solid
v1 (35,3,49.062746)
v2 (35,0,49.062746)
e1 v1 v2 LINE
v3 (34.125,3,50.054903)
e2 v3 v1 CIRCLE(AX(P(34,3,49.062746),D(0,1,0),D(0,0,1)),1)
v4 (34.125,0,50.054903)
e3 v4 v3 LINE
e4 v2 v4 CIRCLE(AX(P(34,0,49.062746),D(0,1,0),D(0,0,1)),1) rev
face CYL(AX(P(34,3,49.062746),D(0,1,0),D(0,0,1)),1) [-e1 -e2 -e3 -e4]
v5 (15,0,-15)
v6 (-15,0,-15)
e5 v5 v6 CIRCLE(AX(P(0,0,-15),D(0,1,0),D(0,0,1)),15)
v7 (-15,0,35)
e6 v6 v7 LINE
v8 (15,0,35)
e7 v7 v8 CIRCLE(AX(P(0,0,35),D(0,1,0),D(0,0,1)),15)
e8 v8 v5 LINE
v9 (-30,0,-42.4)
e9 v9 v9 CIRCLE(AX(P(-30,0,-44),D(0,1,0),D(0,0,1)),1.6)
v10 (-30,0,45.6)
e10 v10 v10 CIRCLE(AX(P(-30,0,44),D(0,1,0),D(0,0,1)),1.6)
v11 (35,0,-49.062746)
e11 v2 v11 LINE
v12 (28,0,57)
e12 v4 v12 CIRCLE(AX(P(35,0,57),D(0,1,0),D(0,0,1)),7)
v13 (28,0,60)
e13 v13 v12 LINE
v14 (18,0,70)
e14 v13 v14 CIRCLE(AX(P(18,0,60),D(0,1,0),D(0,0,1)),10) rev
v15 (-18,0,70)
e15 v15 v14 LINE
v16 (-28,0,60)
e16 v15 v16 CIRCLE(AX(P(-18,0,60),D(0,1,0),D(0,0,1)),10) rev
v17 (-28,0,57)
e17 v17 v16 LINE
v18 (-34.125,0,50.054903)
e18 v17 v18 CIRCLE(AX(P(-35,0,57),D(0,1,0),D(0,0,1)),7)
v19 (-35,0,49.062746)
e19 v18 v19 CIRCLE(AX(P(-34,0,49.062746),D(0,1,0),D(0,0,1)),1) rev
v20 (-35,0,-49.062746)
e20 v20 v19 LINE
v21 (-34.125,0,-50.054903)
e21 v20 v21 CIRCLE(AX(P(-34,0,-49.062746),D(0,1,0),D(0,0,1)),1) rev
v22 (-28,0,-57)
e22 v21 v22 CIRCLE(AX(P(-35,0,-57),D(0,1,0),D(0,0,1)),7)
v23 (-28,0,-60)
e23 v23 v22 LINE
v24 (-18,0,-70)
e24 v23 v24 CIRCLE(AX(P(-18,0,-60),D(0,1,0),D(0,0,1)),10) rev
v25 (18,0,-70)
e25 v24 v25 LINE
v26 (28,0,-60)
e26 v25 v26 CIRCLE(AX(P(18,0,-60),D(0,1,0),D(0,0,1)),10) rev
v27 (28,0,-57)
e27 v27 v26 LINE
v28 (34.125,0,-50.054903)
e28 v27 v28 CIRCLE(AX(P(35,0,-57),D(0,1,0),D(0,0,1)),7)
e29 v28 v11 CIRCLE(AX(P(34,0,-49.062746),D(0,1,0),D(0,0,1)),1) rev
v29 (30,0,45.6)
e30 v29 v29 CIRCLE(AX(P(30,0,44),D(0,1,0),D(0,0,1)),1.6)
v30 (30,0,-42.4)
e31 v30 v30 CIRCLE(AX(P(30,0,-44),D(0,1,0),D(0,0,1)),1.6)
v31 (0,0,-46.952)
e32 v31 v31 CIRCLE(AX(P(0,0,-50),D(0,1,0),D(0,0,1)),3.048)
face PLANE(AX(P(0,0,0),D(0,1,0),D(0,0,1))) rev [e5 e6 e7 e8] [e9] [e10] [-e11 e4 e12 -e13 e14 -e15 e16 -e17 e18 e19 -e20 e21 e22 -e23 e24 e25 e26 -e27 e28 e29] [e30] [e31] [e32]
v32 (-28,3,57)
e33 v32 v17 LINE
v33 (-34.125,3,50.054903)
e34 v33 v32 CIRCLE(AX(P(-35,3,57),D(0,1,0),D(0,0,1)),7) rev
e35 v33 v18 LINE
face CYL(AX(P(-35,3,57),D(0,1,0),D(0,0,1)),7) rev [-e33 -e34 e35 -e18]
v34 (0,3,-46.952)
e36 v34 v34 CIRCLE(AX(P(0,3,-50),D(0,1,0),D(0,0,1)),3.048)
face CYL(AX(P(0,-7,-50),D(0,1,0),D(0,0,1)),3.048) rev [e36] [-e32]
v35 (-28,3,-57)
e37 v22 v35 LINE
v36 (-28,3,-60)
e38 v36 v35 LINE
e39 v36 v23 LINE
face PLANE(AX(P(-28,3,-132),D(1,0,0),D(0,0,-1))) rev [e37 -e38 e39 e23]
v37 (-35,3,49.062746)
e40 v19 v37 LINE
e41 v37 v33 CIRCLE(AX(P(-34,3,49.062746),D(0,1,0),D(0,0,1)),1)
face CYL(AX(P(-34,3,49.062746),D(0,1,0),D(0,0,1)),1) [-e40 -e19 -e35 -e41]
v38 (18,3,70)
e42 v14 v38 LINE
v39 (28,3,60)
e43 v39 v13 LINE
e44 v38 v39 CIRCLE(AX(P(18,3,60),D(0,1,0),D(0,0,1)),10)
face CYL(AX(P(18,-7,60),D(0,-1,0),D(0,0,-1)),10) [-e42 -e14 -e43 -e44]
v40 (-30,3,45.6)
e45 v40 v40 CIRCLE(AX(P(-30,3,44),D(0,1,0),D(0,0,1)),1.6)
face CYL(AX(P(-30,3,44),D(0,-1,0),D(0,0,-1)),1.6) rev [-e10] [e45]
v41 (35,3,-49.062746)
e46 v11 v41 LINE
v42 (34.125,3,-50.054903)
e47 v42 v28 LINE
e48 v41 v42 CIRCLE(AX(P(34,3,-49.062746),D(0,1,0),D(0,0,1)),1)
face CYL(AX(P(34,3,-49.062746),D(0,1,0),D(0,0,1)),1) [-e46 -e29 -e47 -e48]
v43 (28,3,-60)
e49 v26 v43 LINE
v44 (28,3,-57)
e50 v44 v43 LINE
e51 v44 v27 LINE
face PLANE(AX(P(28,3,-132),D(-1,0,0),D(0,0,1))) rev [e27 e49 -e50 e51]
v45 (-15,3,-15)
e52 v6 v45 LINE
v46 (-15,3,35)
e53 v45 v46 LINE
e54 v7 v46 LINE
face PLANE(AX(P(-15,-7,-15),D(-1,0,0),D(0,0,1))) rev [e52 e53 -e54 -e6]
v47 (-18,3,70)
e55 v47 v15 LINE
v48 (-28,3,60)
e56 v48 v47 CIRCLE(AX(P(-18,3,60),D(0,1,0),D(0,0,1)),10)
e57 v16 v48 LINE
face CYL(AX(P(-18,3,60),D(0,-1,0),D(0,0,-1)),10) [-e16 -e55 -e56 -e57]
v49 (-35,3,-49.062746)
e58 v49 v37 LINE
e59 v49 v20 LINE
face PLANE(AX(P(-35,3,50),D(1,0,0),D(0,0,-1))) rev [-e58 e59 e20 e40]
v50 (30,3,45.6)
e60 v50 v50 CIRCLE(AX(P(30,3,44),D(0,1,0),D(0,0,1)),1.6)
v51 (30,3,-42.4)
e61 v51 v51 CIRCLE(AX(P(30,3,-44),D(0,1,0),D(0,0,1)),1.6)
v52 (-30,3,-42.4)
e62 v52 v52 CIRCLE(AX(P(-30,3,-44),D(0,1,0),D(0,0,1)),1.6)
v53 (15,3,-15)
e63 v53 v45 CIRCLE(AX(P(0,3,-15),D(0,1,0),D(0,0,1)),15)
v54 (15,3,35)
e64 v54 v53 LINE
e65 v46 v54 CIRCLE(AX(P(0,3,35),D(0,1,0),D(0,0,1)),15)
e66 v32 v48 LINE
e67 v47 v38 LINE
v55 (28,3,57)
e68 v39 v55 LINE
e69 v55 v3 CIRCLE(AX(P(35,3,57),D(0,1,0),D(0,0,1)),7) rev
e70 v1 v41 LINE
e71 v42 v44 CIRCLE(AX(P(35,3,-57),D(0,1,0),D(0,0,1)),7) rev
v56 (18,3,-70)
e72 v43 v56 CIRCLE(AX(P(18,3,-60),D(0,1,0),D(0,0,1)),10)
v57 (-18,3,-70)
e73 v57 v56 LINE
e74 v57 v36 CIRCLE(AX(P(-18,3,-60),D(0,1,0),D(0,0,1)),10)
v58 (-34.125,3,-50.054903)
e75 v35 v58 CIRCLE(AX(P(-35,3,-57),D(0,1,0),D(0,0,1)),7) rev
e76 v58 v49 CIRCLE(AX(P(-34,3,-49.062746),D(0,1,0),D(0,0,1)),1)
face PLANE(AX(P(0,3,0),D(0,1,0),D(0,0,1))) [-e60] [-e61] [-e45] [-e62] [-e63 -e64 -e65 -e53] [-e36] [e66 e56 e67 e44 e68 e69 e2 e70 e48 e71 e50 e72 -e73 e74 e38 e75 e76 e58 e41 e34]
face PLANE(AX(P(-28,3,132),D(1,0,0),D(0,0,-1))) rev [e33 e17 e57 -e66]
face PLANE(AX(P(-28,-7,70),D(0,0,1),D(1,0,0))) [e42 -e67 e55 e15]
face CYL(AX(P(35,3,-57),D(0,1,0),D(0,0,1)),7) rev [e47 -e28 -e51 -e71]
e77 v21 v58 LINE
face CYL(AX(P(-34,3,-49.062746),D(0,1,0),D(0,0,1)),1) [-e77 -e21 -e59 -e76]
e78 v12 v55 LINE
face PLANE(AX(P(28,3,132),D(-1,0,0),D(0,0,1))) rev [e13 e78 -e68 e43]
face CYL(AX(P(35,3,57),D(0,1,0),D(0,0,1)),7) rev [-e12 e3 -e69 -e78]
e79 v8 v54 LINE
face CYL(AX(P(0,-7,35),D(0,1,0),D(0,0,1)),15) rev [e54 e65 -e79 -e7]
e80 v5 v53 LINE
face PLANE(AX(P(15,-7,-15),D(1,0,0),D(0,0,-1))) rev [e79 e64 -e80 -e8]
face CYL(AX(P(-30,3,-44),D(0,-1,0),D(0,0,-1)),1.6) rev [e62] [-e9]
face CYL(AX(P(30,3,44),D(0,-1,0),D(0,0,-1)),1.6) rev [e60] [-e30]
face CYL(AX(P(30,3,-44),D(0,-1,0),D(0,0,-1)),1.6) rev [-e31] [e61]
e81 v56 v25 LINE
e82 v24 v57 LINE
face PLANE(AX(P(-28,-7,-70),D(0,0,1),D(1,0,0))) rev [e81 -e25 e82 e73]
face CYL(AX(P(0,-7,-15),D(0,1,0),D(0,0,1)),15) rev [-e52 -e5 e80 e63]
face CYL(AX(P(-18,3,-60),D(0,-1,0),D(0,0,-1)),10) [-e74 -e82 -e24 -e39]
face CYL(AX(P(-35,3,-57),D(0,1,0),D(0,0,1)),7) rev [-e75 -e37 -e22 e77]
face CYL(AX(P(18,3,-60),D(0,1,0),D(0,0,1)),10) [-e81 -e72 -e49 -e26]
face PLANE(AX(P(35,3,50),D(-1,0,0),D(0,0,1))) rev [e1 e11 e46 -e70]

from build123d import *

# Parameters (mm, degrees)
SKETCH1_R           = 1.6
BOSS_EXTRUDE1_DEPTH = 3
FILLET1_R           = 7
FILLET2_R           = 1
FILLET3_R           = 50
SKETCH2_W           = 59.626658502
SKETCH2_H           = 94.260753609
CUT_EXTRUDE1_DEPTH  = 10
FILLET4_R           = 10
SKETCH3_R           = 3.048
CUT_EXTRUDE2_DEPTH  = 10


with BuildPart() as part:
    # Sketch1 → Boss-Extrude1 (new body)
    with BuildSketch(Plane(origin=(0, 0, 0), x_dir=(1, 0, 0), z_dir=(0, 1, 0))):
        Polygon((-35, -50), (-28, -50), (-28, -132), (0, -144), (28, -132), (28, -50), (35, -50), (35, 50), (28, 50), (28, 132), (0, 144), (-28, 132), (-28, 50), (-35, 50), align=None)
        with Locations(Location((-30, 44, 0), (0, 0, 270))):
            Circle(SKETCH1_R, mode=Mode.SUBTRACT)
        with Locations(Location((30, 44, 0), (0, 0, 270))):
            Circle(SKETCH1_R, mode=Mode.SUBTRACT)
        with Locations(Location((30, -44, 0), (0, 0, 270))):
            Circle(SKETCH1_R, mode=Mode.SUBTRACT)
        with Locations(Location((-30, -44, 0), (0, 0, 270))):
            Circle(SKETCH1_R, mode=Mode.SUBTRACT)
    extrude(amount=BOSS_EXTRUDE1_DEPTH)

    # Fillet1
    fillet1_edges = [part.edges().sort_by_distance(p)[0] for p in [
        (-28, 1.5, 50),
        (28, 1.5, 50),
        (28, 1.5, -50),
        (-28, 1.5, -50),
    ]]
    fillet(fillet1_edges, radius=FILLET1_R - 0.0001)  # a hair under: the kernel refuses the full size

    # Fillet2
    fillet2_edges = [part.edges().sort_by_distance(p)[0] for p in [
        (35, 1.5, -50),
        (35, 1.5, 50),
        (-35, 1.5, 50),
        (-35, 1.5, -50),
    ]]
    fillet(fillet2_edges, radius=FILLET2_R)

    # Fillet3
    fillet3_edges = [part.edges().sort_by_distance(p)[0] for p in [
        (0, 1.5, 144),
        (0, 1.5, -144),
    ]]
    fillet(fillet3_edges, radius=FILLET3_R)

    # Sketch2 → Cut-Extrude1 (cut)
    with BuildSketch(Plane(origin=(0, 3, 0), x_dir=(1, 0, 0), z_dir=(0, 1, 0))):
        with Locations((1.813329251, 117.130376805)):
            Rectangle(SKETCH2_W, SKETCH2_H)
    cut_extrude1 = extrude(amount=-CUT_EXTRUDE1_DEPTH, mode=Mode.SUBTRACT)

    # Mirror1: Cut-Extrude1 across plane
    add(cut_extrude1.mirror(Plane.XY), mode=Mode.SUBTRACT)

    # Fillet4
    fillet4_edges = [part.edges().sort_by_distance(p)[0] for p in [
        (-28, 1.5, -70),
        (28, 1.5, -70),
        (28, 1.5, 70),
        (-28, 1.5, 70),
    ]]
    fillet(fillet4_edges, radius=FILLET4_R)

    # Sketch3 → Cut-Extrude2 (cut)
    with BuildSketch(Plane(origin=(0, 3, 0), x_dir=(1, 0, 0), z_dir=(0, 1, 0))):
        with Locations(Location((0, 50, 0), (0, 0, 270))):
            Circle(SKETCH3_R)
        with BuildLine():
            Line((15, 15), (15, -35))
            ThreePointArc((15, -35), (0, -50), (-15, -35))
            Line((-15, -35), (-15, 15))
            ThreePointArc((-15, 15), (0, 30), (15, 15))
        make_face()
    extrude(amount=-CUT_EXTRUDE2_DEPTH, mode=Mode.SUBTRACT)


solid = part.part
